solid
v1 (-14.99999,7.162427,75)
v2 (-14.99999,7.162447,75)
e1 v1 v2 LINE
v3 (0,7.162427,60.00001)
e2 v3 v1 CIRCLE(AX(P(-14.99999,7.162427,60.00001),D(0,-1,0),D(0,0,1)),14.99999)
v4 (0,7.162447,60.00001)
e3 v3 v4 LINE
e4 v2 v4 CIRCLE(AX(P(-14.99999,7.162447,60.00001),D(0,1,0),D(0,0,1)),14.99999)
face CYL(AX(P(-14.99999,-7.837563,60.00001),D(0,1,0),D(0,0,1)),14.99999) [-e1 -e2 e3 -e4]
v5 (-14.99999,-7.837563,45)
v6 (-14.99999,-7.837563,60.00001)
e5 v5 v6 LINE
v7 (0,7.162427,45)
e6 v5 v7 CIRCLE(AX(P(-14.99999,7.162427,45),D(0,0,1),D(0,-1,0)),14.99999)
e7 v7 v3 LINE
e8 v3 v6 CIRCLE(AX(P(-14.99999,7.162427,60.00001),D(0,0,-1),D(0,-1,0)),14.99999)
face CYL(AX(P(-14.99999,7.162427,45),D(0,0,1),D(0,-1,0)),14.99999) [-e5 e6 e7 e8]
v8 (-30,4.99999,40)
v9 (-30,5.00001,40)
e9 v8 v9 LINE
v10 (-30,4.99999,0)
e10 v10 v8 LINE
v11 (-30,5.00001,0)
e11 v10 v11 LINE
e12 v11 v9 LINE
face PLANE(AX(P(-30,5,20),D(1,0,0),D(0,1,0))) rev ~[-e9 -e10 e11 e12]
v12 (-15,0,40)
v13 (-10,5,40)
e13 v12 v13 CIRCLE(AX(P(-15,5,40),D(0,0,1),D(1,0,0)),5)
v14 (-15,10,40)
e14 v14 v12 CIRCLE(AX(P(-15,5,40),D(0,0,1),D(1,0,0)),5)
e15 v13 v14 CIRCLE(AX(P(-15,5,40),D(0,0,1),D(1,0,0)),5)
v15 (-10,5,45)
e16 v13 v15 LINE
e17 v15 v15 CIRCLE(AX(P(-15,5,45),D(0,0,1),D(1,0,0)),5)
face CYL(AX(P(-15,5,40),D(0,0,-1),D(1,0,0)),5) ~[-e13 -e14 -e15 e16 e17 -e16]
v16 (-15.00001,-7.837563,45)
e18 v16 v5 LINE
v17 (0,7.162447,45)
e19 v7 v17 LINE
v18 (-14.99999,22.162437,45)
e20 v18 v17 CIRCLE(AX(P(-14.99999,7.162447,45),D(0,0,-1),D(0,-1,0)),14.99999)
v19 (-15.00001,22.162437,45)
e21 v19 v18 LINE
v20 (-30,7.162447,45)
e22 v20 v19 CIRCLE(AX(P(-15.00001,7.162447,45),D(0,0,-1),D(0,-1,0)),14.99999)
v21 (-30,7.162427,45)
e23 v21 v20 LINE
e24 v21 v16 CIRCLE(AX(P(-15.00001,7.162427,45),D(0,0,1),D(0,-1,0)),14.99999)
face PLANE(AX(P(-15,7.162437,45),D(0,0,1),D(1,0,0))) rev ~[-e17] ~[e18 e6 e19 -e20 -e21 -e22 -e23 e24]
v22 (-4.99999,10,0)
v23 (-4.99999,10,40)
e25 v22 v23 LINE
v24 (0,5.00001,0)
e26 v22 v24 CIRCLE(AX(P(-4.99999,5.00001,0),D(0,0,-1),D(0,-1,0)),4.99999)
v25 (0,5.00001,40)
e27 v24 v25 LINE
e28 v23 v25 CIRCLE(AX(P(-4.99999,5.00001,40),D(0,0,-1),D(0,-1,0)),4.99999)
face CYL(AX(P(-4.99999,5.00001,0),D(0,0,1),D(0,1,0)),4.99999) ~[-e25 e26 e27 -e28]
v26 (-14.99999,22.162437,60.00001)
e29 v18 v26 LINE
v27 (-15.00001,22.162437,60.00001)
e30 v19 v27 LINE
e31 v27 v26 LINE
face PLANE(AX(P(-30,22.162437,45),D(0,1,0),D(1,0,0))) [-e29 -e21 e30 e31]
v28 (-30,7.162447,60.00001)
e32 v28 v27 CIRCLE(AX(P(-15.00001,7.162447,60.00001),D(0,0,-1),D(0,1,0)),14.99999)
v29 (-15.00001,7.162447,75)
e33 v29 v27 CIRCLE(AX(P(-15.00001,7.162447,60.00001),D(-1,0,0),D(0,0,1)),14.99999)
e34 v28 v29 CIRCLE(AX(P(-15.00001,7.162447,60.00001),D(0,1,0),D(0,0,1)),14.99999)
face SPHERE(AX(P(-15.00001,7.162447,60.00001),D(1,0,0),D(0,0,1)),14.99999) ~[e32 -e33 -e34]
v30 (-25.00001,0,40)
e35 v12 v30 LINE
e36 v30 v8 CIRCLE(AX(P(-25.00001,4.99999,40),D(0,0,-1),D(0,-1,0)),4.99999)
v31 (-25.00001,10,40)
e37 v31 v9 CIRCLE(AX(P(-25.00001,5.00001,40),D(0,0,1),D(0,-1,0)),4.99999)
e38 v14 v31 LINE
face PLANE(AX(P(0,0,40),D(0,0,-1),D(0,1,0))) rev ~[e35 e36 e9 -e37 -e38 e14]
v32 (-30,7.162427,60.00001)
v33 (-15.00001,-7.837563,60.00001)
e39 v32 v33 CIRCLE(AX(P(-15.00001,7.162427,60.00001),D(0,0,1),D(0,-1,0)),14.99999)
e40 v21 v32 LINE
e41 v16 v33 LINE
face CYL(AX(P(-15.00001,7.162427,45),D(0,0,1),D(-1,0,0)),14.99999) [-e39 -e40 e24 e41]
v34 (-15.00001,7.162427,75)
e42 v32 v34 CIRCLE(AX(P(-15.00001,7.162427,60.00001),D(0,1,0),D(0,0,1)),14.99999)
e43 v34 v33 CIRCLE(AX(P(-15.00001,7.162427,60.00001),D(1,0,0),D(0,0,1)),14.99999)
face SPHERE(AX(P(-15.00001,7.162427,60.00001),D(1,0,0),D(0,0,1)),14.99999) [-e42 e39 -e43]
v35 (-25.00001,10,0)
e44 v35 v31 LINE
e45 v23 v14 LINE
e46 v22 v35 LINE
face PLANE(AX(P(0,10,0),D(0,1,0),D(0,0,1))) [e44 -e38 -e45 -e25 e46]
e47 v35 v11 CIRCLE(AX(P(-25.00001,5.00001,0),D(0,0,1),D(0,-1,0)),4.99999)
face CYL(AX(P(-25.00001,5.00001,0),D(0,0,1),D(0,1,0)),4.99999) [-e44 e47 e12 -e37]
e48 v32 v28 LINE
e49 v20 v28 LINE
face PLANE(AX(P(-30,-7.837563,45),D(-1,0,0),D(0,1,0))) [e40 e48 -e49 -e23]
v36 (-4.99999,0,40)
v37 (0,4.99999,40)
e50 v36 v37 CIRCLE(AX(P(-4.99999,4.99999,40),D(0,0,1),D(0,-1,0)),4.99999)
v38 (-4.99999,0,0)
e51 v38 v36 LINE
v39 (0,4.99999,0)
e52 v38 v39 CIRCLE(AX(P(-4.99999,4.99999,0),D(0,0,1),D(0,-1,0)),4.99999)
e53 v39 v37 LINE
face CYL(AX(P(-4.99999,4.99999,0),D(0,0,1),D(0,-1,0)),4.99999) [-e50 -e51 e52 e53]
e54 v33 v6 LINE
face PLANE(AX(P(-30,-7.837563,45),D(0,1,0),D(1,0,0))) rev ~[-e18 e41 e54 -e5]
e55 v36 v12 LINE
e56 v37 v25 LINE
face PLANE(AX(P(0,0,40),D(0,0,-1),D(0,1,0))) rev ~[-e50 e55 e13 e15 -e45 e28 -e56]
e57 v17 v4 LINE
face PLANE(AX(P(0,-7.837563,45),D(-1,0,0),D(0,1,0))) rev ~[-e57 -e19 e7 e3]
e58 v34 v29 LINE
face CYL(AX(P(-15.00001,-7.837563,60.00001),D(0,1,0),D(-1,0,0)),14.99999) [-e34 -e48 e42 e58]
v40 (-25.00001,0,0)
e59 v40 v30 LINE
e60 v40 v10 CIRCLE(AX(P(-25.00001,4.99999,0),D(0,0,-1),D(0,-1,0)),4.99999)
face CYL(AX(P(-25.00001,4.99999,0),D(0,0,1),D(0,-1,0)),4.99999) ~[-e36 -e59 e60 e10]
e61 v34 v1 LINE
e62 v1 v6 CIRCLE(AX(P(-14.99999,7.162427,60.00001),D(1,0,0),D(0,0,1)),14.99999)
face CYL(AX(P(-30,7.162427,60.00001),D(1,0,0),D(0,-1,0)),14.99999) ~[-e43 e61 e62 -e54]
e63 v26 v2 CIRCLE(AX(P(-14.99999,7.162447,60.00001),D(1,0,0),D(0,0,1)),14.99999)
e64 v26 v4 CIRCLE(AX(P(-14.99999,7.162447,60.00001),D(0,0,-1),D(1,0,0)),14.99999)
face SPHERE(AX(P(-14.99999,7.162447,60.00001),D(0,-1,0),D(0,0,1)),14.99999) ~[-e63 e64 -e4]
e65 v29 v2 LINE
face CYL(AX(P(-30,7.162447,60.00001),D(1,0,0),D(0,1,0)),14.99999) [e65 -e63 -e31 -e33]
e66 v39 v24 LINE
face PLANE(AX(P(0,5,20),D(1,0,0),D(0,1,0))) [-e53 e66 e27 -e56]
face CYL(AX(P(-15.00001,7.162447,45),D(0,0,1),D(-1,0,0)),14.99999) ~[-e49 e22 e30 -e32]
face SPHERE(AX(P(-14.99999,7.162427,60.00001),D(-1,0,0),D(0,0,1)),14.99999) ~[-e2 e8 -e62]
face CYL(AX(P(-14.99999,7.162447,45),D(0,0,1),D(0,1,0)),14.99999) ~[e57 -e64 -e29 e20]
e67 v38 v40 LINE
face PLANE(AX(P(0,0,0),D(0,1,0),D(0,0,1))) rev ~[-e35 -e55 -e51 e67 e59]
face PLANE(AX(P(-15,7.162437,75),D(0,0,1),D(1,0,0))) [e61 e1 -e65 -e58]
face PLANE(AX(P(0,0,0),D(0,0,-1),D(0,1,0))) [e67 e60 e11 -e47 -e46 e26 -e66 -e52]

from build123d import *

# Parameters (mm, degrees)
F0_W     = 10
F0_H     = 40
F1_DEPTH = 30
F2_R     = 4.99999
F3_R     = 5
F4_DEPTH = 5
F5_W     = 30
F5_H     = 30
F6_DEPTH = 30
F7_R     = 14.99999


# Not quite as in the source:
# - a fillet or chamfer is up to 0.001 mm smaller than in the source, because OpenCascade refuses the exact size


with BuildPart() as f1:
    # F0 (on Right) → F1 (new body)
    with BuildSketch(Plane.YZ):
        with Locations((5, 20)):
            Rectangle(F0_W, F0_H)
    extrude(amount=-F1_DEPTH)

    # F2 (radius 5 in the source; OpenCascade refuses exactly that, so slightly less here)
    f2_edges = [f1.edges().sort_by_distance(p)[0] for p in [
        (0, 10, 20),
        (0, 0, 20),
        (-30, 10, 20),
        (-30, 0, 20),
    ]]
    fillet(f2_edges, radius=F2_R)

    # F3 (on face) → F4 (join)
    with BuildSketch(Plane.XY.offset(40)):
        with Locations((-15, 5)):
            Circle(F3_R)
    extrude(amount=F4_DEPTH)

    # F5 (on face) → F6 (join)
    with BuildSketch(Plane.XY.offset(45)):
        with Locations((-15, 7.1624371922)):
            Rectangle(F5_W, F5_H)
    extrude(amount=F6_DEPTH)

    # F7 (radius 15 in the source; OpenCascade refuses exactly that, so slightly less here)
    f7_edges = [f1.edges().sort_by_distance(p)[0] for p in [
        (-15, -7.837563, 75),
        (0, 7.162437, 75),
        (-15, 22.162437, 75),
        (-30, 7.162437, 75),
        (-30, 22.162437, 60),
        (0, 22.162437, 60),
        (0, -7.837563, 60),
        (-30, -7.837563, 60),
    ]]
    fillet(f7_edges, radius=F7_R)


solid = f1.part
